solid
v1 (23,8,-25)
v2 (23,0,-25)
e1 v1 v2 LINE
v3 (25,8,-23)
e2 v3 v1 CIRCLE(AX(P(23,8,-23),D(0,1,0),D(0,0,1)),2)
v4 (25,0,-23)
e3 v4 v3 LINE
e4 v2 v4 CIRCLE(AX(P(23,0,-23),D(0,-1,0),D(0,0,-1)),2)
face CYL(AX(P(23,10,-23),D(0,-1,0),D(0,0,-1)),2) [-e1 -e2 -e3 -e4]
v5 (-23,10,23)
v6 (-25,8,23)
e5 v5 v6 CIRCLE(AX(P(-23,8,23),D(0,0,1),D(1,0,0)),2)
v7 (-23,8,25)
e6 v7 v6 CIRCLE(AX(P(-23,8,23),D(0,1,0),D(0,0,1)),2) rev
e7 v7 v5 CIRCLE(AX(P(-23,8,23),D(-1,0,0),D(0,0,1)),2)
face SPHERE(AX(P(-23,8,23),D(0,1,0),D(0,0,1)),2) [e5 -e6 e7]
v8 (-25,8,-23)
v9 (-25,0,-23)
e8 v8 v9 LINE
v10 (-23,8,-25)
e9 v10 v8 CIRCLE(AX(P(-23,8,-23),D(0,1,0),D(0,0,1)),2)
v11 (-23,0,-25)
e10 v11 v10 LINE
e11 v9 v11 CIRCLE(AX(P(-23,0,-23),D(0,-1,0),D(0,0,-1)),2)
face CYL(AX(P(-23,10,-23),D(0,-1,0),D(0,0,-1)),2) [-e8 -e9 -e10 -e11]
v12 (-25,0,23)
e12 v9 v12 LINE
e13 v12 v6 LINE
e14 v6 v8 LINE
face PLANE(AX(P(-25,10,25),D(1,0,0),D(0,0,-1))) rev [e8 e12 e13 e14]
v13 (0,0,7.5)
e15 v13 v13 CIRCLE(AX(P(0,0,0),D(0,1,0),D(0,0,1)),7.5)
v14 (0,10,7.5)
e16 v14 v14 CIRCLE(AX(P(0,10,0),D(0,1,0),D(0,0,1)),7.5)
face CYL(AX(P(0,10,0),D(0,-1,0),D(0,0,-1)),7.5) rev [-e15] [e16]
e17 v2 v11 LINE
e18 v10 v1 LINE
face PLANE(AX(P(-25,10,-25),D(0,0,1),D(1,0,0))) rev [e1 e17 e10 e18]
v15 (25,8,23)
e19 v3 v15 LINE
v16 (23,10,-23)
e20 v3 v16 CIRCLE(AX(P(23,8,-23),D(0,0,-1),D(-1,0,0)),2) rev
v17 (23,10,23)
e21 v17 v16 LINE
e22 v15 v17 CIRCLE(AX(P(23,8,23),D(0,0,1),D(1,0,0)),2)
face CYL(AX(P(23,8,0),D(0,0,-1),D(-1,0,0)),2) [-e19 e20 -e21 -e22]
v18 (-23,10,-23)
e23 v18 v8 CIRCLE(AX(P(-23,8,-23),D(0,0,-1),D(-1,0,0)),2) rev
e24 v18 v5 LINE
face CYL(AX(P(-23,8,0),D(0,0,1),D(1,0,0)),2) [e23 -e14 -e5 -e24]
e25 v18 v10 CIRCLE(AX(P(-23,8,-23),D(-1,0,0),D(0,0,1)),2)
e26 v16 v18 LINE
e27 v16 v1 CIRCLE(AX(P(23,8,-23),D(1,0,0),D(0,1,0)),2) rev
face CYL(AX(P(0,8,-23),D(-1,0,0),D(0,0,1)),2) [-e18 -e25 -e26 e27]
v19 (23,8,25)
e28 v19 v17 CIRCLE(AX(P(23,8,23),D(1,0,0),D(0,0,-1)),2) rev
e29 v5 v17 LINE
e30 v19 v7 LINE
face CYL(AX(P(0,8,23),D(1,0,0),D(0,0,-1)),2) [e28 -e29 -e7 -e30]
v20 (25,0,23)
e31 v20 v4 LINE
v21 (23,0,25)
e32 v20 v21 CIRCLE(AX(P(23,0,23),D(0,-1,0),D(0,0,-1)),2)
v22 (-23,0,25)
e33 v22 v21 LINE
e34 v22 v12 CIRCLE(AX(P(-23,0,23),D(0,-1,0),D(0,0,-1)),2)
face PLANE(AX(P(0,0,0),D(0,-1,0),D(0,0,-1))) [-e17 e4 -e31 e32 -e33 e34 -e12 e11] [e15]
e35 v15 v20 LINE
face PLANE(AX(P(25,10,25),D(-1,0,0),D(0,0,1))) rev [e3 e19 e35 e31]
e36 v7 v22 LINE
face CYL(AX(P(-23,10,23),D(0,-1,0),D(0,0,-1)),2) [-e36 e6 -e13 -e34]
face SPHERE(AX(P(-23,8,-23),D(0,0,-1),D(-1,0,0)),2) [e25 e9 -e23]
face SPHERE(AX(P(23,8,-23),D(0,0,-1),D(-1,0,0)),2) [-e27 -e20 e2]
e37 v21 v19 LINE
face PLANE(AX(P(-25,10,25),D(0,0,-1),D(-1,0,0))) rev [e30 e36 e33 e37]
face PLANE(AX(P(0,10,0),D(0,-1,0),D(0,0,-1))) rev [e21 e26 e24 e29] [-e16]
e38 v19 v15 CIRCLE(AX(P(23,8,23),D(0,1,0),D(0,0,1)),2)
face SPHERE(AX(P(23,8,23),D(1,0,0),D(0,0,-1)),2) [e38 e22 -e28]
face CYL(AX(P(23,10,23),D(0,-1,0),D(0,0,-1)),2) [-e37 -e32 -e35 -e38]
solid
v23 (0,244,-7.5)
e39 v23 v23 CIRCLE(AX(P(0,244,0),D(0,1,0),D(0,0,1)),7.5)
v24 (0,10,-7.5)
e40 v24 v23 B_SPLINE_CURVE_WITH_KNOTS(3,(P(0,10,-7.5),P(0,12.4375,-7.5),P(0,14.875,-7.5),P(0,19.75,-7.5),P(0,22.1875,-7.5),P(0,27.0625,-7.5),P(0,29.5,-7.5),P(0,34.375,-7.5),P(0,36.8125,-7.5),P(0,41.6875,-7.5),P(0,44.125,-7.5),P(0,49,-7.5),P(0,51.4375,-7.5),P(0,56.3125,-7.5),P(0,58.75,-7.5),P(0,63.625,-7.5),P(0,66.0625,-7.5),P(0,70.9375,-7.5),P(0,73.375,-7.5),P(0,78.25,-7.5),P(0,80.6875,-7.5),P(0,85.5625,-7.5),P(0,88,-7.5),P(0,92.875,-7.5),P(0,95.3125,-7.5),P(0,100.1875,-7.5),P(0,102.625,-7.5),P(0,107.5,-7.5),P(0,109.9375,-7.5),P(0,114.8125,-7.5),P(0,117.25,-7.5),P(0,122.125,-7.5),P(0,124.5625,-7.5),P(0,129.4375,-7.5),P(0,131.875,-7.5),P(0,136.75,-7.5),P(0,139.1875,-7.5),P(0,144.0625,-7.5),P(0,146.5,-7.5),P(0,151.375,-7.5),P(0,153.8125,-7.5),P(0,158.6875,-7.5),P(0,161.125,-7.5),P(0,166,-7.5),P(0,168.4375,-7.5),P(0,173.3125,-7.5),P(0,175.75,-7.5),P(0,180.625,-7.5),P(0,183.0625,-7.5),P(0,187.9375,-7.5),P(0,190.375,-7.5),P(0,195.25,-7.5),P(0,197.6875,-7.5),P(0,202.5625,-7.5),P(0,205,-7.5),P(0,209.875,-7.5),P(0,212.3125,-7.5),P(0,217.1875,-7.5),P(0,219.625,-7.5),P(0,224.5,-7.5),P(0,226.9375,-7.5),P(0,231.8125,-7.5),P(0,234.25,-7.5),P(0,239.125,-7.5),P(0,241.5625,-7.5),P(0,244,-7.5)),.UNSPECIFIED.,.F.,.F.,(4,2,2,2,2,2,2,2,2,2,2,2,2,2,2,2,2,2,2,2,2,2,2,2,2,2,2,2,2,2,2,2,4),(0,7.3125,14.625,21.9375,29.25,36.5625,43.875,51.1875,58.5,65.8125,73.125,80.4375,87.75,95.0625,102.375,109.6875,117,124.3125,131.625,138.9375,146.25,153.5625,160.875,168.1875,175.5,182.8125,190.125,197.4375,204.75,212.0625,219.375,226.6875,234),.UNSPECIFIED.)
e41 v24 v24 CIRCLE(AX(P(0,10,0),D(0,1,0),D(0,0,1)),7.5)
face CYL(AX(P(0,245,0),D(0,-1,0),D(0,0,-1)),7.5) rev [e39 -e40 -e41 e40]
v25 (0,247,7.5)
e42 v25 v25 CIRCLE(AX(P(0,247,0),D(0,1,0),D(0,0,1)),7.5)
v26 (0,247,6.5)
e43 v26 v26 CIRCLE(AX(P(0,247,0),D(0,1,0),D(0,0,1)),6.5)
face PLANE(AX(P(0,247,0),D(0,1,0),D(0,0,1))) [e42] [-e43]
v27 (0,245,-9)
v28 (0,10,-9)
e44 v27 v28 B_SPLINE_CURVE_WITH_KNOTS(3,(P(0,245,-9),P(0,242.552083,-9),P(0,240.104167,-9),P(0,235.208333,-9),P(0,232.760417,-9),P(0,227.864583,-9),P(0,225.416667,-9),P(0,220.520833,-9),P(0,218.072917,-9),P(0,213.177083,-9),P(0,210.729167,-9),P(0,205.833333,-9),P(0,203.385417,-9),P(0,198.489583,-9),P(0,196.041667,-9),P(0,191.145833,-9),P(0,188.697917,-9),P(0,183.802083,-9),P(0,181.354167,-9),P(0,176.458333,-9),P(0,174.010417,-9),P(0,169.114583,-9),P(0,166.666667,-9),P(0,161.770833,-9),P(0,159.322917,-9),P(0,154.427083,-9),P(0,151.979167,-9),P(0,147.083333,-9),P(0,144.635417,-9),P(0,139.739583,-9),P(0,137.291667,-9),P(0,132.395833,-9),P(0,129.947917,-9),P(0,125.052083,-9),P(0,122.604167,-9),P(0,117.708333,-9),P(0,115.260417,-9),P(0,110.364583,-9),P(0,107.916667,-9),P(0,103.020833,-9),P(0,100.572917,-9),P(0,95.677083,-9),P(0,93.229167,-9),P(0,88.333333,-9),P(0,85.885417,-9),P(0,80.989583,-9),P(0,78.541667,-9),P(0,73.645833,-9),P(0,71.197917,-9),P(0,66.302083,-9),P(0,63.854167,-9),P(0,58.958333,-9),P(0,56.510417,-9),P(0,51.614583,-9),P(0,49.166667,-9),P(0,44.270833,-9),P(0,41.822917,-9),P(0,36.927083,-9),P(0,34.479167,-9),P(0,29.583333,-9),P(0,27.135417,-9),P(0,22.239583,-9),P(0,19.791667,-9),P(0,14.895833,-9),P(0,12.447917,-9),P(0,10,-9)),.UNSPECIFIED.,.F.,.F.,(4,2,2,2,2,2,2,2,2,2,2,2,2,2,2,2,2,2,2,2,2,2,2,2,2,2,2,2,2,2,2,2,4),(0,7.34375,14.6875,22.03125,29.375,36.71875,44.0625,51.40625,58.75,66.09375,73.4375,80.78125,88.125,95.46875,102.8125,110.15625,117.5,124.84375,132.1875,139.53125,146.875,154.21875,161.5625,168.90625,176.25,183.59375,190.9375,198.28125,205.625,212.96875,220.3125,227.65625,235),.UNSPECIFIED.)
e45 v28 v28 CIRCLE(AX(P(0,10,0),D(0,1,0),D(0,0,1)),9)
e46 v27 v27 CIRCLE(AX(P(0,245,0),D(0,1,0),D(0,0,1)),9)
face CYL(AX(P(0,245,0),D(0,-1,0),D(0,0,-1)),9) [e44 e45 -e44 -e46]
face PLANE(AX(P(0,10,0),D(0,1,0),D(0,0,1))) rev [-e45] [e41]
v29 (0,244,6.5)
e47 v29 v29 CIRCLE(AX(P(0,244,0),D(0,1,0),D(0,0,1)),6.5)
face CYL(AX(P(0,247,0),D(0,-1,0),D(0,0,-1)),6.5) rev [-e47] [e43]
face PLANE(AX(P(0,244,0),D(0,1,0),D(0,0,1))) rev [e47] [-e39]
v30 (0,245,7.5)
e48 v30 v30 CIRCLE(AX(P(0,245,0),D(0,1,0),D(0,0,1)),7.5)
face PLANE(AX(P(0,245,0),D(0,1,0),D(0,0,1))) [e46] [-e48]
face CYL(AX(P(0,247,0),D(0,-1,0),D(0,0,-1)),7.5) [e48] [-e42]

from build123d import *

# Parameters (mm, degrees)
SKETCH_219_W       = 50
SKETCH_219_H       = 50
SKETCH_219_R       = 7.5
EXTRUDE_1_DEPTH    = 10
FILLET_2_R         = 2
SKETCH_982_R       = 9
EXTRUDE_2_DEPTH    = 235
SHELL_6_T          = -1.5
SKETCH_6_R         = 7.5
EXTRUDE_5_DEPTH    = 3
SHELL_START        = 244
SHELL_13_OUTLINE_R = 6.5
SHELL_13_DEPTH     = 3


# Read off the part's stored shape, not the designer's step: 抽壳13
with BuildPart() as part:
    # Sketch 219 → 凸台-拉伸1 (new body)
    with BuildSketch(Plane(origin=(0, 0, 0), x_dir=(1, 0, 0), z_dir=(0, 1, 0))):
        Rectangle(SKETCH_219_W, SKETCH_219_H)
        with Locations(Location((0, 0, 0), (0, 0, 270))):
            Circle(SKETCH_219_R, mode=Mode.SUBTRACT)
    extrude(amount=EXTRUDE_1_DEPTH)

    # 圆角2
    fillet_2_edges = [part.edges().sort_by_distance(p)[0] for p in [
        (-25, 10, 0),
        (0, 10, 25),
        (25, 10, 0),
        (25, 5, 25),
        (-25, 5, 25),
        (-25, 5, -25),
        (25, 5, -25),
        (0, 10, -25),
    ]]
    fillet(fillet_2_edges, radius=FILLET_2_R)


with BuildPart() as body_2:
    # Sketch 982 → 凸台-拉伸2 (new body)
    with BuildSketch(Plane(origin=(0, 10, 0), x_dir=(1, 0, 0), z_dir=(0, 1, 0))):
        with Locations(Location((0, 0, 0), (0, 0, 90))):
            Circle(SKETCH_982_R)
    extrude(amount=EXTRUDE_2_DEPTH)

    # 抽壳6
    shell_6_openings = [body_2.faces().sort_by_distance(p)[0] for p in [
        (0, 245, 0),
        (0, 10, 0),
    ]]
    offset(amount=SHELL_6_T, openings=shell_6_openings, kind=Kind.INTERSECTION)

    # 草图6 → 凸台-拉伸5 (add)
    with BuildSketch(Plane(origin=(0, 244, 0), x_dir=(1, 0, 0), z_dir=(0, 1, 0))):
        with Locations(Location((0, 0, 0), (0, 0, 90))):
            Circle(SKETCH_6_R)
    extrude(amount=EXTRUDE_5_DEPTH)

    # 抽壳13 outline → 抽壳13 (cut)
    with BuildSketch(Plane(origin=(0, 0, 0), x_dir=(1, 0, 0), z_dir=(0, 1, 0)).offset(SHELL_START)):
        Circle(SHELL_13_OUTLINE_R)
    extrude(amount=SHELL_13_DEPTH, mode=Mode.SUBTRACT)


solid = Compound([part.part, body_2.part])
